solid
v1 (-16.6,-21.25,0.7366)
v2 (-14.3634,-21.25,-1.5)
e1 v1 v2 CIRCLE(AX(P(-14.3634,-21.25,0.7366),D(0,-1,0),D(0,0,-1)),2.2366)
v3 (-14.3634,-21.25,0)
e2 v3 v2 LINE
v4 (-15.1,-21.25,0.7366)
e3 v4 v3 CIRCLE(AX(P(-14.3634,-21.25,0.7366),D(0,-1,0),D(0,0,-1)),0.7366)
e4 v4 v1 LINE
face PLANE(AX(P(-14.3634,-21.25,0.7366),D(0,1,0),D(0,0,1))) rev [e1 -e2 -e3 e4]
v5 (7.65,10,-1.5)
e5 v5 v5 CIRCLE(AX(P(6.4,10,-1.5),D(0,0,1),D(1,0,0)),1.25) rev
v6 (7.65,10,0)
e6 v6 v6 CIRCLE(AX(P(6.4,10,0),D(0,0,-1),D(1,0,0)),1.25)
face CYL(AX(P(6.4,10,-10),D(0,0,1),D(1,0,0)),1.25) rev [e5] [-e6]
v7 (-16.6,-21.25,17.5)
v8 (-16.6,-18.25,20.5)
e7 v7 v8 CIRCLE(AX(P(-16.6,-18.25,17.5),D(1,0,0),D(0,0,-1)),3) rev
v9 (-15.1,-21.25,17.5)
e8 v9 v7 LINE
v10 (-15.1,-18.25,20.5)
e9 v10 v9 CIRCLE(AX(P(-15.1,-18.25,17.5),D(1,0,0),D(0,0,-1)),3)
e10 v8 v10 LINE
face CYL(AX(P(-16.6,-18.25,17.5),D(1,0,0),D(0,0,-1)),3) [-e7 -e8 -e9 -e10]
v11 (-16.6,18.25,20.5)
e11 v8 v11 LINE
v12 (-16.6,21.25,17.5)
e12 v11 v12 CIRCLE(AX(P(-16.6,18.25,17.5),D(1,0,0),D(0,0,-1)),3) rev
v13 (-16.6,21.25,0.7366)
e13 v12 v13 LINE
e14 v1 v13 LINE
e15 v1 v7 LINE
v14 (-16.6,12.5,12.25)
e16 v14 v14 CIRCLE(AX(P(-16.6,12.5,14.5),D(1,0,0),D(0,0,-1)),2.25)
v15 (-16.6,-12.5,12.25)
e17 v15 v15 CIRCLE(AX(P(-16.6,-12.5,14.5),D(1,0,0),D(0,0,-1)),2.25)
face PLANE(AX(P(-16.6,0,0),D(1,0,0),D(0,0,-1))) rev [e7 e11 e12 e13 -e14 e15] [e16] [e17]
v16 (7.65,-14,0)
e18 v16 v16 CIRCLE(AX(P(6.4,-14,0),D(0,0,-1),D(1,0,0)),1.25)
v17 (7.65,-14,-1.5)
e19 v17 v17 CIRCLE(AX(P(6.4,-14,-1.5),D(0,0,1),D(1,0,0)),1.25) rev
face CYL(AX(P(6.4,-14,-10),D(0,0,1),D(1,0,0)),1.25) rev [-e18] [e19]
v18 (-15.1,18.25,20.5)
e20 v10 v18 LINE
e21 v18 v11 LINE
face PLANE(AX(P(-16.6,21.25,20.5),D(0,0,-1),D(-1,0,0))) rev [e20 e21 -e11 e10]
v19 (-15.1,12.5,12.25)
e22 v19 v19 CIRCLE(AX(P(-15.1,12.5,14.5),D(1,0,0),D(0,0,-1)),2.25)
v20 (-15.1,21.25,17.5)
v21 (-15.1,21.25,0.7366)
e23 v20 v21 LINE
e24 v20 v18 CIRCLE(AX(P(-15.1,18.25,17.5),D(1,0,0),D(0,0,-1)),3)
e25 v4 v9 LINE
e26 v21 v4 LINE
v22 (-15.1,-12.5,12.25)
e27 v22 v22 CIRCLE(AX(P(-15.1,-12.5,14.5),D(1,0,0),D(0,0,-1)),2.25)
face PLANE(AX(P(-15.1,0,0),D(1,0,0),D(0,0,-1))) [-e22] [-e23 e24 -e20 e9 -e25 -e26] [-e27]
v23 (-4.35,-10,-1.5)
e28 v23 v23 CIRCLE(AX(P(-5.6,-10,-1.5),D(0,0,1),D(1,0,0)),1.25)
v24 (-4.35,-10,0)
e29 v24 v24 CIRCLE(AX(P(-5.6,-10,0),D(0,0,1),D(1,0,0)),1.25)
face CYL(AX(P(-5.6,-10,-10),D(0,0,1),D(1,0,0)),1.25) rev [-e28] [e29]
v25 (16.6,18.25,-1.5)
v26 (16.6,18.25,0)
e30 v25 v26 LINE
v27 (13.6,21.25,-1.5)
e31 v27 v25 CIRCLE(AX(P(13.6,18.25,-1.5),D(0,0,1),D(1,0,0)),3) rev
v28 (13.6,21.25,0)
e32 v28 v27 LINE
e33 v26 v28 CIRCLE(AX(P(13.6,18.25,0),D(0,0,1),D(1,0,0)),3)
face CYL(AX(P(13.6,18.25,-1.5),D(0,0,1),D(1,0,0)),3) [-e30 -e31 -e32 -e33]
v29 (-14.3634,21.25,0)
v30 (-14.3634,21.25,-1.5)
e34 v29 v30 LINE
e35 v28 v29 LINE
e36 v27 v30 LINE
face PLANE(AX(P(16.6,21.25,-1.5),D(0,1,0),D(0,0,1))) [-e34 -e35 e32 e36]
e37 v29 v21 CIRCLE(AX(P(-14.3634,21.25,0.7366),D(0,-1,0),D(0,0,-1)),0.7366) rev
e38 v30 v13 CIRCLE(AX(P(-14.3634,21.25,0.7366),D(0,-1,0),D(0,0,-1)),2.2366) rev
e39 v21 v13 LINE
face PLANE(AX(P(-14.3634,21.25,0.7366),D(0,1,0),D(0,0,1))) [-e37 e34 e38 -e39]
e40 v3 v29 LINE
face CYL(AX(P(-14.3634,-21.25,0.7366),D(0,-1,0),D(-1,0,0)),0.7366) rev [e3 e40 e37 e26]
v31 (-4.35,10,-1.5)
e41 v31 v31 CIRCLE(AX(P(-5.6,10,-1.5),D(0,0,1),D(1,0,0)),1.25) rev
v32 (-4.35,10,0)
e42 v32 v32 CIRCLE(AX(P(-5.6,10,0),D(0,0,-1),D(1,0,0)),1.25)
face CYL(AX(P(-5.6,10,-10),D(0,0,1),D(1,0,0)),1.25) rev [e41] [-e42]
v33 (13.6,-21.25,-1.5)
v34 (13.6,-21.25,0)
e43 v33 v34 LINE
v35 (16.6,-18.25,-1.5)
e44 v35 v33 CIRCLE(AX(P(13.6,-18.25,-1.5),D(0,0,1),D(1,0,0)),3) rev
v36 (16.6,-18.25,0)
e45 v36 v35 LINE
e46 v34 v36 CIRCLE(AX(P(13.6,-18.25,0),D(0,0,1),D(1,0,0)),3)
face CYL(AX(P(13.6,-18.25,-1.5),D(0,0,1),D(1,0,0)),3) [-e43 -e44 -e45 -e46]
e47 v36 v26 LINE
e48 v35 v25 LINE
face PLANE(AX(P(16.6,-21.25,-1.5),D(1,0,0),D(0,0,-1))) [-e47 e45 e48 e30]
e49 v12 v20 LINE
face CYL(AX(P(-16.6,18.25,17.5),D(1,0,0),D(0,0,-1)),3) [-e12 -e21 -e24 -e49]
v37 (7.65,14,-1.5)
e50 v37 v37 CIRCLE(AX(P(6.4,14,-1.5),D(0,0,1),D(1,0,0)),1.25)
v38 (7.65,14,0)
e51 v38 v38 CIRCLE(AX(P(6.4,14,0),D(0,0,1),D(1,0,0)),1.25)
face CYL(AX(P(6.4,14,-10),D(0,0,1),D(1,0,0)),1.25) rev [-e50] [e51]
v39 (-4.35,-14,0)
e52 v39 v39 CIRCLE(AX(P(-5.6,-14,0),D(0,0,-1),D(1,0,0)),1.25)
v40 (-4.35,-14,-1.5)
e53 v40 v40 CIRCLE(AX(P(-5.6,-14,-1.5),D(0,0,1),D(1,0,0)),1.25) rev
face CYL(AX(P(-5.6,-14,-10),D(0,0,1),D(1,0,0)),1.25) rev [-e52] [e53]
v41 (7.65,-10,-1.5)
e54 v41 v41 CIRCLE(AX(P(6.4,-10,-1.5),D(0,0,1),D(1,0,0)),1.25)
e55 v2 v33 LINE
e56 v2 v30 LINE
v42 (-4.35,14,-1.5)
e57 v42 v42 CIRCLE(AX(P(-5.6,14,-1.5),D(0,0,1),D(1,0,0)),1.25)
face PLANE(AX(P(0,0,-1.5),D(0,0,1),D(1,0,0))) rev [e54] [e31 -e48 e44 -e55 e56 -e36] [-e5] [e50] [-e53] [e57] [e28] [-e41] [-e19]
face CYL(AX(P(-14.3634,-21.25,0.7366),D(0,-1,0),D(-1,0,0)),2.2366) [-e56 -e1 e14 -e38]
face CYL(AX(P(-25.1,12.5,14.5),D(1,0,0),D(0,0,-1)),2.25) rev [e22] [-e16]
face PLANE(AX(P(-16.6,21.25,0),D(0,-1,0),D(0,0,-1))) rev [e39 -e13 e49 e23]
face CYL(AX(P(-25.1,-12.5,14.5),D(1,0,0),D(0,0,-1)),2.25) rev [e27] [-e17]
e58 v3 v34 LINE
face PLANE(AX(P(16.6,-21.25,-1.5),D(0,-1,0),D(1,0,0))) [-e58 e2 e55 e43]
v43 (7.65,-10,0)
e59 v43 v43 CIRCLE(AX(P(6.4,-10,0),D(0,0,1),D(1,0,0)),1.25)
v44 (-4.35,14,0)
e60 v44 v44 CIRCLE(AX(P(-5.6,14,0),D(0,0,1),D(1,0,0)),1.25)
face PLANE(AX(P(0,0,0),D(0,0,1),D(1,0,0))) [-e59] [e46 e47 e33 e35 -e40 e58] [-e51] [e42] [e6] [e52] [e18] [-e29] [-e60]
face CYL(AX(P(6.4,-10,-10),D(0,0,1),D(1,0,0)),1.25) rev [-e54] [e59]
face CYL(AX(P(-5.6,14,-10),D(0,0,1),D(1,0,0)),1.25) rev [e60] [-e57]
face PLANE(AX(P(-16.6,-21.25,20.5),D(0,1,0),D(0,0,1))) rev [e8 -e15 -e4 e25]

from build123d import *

# Parameters (mm, degrees)
SKETCH_1_W                       = 33.2
SKETCH_1_H                       = 42.5
SM_BASE_FLANGE_1_DEPTH           = 1.5
SM_EDGE_FLANGE_1_STRIP_W         = 7.4732
SM_EDGE_FLANGE_1_STRIP_H         = 1.5
SM_EDGE_FLANGE_1_STRIP_CUT_DEPTH = 42.5
SM_EDGE_FLANGE_1_DEPTH           = 42.5
SKETCH_9_R                       = 1.25
CUT_EXTRUDE_1_DEPTH              = 10
SKETCH_10_R                      = 2.25
CUT_EXTRUDE_2_DEPTH              = 10
FILLET_1_R                       = 3


# Sheet-metal steps are written as plain solids
with BuildPart() as part:
    # Sketch 1 → 基体-法兰1 (new body)
    with BuildSketch(Plane.XY):
        Rectangle(SKETCH_1_W, SKETCH_1_H)
    extrude(amount=-SM_BASE_FLANGE_1_DEPTH)

    # 边线-法兰1 strip (across the edge) → 边线-法兰1 strip cut (cut)
    with BuildSketch(Plane(origin=(-16.6, 21.25, 0), x_dir=(1, 0, 0), z_dir=(0, -1, 0))):
        with Locations((-1.5, -0.75)):
            Rectangle(SM_EDGE_FLANGE_1_STRIP_W, SM_EDGE_FLANGE_1_STRIP_H)
    extrude(amount=SM_EDGE_FLANGE_1_STRIP_CUT_DEPTH, mode=Mode.SUBTRACT)

    # 边线-法兰1 section (across the edge) → 边线-法兰1 (add)
    with BuildSketch(Plane(origin=(-16.6, 21.25, 0), x_dir=(1, 0, 0), z_dir=(0, -1, 0))):
        with BuildLine():
            Line((0, 0.7366), (0, 20.5))
            Line((0, 20.5), (1.5, 20.5))
            Line((1.5, 20.5), (1.5, 0.7366))
            ThreePointArc((1.5, 0.7366), (1.715745145, 0.215745145), (2.2366, 0))
            Line((2.2366, 0), (2.2366, -1.5))
            ThreePointArc((2.2366, -1.5), (0.655084973, -0.844915027), (0, 0.7366))
        make_face()
    extrude(amount=SM_EDGE_FLANGE_1_DEPTH)

    # 草图9 → 切除-拉伸1 (cut)
    with BuildSketch(Plane.XY):
        with Locations((6.4, 14)):
            Circle(SKETCH_9_R)
        with Locations((-5.6, 14)):
            Circle(SKETCH_9_R)
        with Locations((6.4, -10)):
            Circle(SKETCH_9_R)
        with Locations((-5.6, -10)):
            Circle(SKETCH_9_R)
    cut_extrude_1 = extrude(amount=-CUT_EXTRUDE_1_DEPTH, mode=Mode.SUBTRACT)

    # 草图10 → 切除-拉伸2 (cut)
    with BuildSketch(Plane(origin=(-15.1, 0, 0), x_dir=(0, 0, -1), z_dir=(1, 0, 0))):
        with Locations((-14.5, 12.5)):
            Circle(SKETCH_10_R)
        with Locations((-14.5, -12.5)):
            Circle(SKETCH_10_R)
    extrude(amount=-CUT_EXTRUDE_2_DEPTH, mode=Mode.SUBTRACT)

    # 镜向1: 切除-拉伸1 across plane
    add(cut_extrude_1.mirror(Plane.ZX), mode=Mode.SUBTRACT)

    # 圆角1
    fillet_1_edges = [part.edges().sort_by_distance(p)[0] for p in [
        (-15.85, 21.25, 20.5),
        (-15.85, -21.25, 20.5),
        (16.6, 21.25, -0.75),
        (16.6, -21.25, -0.75),
    ]]
    fillet(fillet_1_edges, radius=FILLET_1_R)


solid = part.part
